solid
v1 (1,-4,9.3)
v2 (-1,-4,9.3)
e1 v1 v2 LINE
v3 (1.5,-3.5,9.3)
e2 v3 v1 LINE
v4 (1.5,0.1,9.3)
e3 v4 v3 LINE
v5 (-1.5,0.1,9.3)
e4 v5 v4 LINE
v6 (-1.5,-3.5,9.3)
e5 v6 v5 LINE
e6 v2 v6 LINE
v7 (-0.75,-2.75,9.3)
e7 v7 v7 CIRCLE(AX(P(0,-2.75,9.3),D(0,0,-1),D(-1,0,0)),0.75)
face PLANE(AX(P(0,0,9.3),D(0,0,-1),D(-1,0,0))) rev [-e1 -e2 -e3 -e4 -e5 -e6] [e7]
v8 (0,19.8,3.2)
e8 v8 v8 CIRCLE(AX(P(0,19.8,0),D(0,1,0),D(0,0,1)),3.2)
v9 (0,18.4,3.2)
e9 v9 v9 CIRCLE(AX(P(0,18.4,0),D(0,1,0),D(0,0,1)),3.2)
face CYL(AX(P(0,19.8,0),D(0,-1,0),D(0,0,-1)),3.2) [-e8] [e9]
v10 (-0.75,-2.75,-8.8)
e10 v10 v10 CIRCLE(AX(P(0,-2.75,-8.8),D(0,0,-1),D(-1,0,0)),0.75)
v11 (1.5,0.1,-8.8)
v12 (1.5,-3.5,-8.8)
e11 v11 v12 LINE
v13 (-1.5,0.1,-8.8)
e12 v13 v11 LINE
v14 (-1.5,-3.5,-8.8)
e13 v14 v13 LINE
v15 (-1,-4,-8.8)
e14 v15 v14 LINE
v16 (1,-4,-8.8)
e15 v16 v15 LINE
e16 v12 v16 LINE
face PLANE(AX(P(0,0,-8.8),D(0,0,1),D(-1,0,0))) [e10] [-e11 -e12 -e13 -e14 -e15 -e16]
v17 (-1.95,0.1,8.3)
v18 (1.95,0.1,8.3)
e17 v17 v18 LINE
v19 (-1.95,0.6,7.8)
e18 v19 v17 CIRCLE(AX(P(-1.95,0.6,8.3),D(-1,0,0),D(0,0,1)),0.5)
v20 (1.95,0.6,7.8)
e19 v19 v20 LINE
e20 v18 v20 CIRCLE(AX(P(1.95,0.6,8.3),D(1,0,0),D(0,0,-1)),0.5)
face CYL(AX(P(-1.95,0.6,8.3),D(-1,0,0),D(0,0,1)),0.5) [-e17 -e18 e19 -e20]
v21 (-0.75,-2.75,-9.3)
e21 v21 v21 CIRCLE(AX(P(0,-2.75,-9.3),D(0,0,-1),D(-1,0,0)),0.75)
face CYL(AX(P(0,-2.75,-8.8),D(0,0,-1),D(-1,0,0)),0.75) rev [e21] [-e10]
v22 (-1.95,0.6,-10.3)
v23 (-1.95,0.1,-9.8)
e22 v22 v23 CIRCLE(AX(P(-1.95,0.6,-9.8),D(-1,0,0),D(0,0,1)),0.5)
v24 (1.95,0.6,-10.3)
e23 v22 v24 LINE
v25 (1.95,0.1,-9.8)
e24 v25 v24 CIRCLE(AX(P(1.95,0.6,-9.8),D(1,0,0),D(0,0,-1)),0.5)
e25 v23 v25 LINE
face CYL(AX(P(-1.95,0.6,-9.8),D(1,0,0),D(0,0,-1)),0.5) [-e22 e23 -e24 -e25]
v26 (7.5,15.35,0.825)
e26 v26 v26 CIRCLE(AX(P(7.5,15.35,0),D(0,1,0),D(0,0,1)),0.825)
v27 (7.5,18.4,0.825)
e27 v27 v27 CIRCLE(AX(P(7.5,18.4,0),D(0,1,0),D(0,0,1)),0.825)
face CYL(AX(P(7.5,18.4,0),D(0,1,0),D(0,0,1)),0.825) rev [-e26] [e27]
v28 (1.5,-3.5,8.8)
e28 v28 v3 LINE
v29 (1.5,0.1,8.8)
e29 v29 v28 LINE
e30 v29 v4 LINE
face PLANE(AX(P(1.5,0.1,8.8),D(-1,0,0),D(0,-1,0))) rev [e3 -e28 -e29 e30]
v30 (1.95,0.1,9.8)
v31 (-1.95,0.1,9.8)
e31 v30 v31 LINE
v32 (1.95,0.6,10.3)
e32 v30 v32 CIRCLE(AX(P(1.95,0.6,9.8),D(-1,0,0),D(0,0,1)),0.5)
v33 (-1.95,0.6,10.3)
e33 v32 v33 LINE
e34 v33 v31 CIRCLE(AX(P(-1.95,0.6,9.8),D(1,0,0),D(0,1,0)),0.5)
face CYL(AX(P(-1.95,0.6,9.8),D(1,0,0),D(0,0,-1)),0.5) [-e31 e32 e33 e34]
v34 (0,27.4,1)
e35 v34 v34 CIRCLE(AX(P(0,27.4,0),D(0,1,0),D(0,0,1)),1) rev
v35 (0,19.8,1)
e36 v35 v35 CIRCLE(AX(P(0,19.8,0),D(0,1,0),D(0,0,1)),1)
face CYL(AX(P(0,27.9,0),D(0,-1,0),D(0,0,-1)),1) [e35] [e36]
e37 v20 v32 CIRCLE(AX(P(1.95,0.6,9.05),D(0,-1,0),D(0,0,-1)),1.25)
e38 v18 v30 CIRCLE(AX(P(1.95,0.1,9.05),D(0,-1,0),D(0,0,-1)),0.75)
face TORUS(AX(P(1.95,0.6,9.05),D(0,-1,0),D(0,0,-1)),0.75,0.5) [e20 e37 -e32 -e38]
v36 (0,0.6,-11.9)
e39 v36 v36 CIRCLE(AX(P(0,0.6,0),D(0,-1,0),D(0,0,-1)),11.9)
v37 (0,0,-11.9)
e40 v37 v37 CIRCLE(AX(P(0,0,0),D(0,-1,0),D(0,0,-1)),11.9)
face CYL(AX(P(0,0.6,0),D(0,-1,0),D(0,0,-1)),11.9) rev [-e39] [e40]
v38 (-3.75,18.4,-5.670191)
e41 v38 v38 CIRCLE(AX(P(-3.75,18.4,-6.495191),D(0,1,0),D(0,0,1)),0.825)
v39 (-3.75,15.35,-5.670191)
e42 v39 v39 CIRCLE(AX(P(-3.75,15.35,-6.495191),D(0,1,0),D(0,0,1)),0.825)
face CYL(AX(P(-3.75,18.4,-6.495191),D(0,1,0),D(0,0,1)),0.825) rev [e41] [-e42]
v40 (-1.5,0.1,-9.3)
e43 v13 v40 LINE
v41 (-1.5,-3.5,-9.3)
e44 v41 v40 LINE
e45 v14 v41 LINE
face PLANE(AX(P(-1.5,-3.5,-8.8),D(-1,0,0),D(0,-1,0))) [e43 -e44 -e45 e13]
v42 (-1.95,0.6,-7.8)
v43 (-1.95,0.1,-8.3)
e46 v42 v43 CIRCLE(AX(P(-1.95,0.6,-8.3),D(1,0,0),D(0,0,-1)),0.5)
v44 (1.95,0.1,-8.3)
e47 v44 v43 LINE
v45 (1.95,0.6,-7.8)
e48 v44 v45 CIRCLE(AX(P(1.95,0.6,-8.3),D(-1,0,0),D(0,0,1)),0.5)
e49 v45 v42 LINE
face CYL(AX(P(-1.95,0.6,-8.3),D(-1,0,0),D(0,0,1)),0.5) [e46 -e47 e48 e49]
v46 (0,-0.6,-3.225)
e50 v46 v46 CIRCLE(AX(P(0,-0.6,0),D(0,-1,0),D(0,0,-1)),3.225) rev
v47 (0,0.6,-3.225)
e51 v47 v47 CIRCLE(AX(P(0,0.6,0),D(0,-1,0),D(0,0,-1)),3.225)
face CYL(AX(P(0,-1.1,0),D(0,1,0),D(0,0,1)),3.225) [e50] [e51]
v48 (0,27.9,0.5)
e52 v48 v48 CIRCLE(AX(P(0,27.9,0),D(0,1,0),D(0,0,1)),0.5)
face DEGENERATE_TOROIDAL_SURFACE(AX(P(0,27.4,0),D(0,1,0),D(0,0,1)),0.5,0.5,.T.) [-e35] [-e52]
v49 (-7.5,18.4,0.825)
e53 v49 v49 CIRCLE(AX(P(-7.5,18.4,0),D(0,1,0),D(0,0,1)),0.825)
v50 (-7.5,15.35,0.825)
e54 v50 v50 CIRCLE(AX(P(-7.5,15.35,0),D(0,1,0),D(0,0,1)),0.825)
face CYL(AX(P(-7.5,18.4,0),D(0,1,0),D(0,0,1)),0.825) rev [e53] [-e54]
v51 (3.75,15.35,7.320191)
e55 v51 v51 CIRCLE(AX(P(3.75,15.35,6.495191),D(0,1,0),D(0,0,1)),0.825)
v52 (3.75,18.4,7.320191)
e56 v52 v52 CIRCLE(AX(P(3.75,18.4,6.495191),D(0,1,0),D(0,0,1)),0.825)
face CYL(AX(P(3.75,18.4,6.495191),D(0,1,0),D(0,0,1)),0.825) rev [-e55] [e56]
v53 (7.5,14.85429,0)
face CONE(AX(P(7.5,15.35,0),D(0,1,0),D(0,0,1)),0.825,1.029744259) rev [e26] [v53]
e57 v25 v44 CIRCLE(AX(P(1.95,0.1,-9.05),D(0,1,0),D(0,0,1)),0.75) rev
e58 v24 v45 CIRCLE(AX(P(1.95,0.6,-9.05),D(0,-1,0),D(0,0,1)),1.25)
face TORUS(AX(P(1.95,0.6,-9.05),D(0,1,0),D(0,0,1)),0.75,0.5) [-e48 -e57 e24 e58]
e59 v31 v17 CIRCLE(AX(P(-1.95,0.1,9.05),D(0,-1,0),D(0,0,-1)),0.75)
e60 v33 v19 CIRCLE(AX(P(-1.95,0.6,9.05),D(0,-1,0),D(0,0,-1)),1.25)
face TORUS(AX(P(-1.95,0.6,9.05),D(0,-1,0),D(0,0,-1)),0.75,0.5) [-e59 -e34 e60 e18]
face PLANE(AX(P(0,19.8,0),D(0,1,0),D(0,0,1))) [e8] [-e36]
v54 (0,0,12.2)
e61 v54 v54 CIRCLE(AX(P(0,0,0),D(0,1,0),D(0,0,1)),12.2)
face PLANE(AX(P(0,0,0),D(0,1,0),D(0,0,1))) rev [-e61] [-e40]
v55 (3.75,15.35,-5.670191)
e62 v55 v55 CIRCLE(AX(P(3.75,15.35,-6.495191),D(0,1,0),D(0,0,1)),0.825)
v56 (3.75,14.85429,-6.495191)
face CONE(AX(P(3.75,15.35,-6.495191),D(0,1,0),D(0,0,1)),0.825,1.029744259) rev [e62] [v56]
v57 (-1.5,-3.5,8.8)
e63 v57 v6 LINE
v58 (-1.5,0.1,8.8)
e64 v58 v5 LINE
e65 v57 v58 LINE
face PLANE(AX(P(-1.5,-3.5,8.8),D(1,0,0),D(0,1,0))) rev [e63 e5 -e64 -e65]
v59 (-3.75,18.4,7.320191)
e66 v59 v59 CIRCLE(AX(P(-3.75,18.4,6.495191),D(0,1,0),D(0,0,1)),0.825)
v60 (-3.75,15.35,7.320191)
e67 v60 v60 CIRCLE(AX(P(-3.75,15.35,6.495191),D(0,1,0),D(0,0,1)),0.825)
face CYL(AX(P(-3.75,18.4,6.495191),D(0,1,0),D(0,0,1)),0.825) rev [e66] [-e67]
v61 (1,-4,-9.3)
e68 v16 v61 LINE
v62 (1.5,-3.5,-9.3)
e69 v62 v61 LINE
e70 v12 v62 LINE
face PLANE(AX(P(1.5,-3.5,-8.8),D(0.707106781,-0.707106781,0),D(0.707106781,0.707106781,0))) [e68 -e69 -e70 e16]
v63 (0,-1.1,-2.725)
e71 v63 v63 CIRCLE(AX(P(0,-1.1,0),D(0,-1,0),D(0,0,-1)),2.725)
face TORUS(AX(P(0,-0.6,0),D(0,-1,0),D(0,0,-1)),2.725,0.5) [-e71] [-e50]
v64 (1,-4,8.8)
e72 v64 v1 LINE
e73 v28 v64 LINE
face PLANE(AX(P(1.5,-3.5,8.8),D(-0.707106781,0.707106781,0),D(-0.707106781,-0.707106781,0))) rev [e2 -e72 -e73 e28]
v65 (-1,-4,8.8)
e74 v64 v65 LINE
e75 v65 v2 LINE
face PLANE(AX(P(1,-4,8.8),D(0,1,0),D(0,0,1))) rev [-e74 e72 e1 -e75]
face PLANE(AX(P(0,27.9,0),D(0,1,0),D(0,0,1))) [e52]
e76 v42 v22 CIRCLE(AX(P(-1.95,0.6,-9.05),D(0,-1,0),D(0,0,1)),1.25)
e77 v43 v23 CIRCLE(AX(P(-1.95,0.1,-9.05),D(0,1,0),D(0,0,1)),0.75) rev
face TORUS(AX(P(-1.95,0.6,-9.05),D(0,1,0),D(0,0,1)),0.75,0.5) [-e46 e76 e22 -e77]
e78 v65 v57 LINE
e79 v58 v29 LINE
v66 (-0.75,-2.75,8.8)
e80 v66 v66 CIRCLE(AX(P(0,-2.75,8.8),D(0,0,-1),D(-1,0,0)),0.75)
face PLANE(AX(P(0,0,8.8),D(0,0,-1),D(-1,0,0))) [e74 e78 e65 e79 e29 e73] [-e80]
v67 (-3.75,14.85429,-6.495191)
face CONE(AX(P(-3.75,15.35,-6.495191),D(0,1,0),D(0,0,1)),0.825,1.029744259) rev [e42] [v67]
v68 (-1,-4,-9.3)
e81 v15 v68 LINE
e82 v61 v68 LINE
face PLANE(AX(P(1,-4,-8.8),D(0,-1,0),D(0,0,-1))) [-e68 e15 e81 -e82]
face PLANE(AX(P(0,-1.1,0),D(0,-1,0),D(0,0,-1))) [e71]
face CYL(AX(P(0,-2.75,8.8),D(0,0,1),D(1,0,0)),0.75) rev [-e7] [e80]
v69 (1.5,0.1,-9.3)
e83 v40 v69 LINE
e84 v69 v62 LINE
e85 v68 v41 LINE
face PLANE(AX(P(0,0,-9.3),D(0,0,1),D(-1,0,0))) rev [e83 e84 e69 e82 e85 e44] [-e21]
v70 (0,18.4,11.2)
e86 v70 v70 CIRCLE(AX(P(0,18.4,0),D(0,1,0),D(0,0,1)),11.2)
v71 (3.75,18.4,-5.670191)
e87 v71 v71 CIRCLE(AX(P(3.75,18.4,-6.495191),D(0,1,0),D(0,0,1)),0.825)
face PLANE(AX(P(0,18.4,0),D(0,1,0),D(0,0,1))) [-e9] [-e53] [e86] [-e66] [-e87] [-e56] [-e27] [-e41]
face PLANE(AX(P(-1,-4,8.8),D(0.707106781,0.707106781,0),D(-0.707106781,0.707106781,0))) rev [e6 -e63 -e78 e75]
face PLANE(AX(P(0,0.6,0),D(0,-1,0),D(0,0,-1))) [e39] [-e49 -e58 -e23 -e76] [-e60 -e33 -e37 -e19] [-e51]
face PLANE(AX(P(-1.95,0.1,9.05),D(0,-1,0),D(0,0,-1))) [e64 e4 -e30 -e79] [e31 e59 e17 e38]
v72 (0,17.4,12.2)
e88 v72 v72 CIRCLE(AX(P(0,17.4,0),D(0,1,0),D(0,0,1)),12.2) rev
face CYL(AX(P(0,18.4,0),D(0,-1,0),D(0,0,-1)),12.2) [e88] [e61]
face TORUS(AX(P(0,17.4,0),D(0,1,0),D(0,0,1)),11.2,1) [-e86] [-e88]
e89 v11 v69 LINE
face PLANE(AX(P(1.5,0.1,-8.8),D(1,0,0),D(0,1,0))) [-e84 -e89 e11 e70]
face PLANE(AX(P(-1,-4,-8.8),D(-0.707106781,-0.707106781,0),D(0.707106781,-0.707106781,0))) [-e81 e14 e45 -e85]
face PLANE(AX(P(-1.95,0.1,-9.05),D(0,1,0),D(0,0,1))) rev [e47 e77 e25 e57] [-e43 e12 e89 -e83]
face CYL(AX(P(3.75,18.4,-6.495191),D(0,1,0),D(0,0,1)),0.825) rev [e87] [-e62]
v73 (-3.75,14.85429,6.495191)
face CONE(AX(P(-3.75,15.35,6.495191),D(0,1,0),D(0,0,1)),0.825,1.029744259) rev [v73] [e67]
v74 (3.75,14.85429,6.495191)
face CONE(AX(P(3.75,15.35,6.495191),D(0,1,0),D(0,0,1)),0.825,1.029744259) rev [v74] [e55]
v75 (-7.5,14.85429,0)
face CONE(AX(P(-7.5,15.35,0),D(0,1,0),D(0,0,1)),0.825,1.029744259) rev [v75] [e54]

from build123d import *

# Parameters (mm, degrees)
SKETCH1_R                  = 12.2
BOSS_EXTRUDE1_DEPTH        = 18.4
FILLET1_R                  = 1
M2X0_35_TAPPED_HOLE1_D     = 1.65
M2X0_35_TAPPED_HOLE1_DEPTH = 3.05
M2X0_35_TAPPED_HOLE1_TIP   = 0.495710011
SKETCH5_R                  = 3.2
BOSS_EXTRUDE2_DEPTH        = 1.4
SKETCH6_R                  = 1
BOSS_EXTRUDE3_DEPTH        = 8.1
FILLET2_R                  = 0.5
SKETCH8_R                  = 11.9
CUT_EXTRUDE1_DEPTH         = 0.6
SKETCH9_R                  = 3.225
BOSS_EXTRUDE4_DEPTH        = 1.7
FILLET3_R                  = 0.5
BOSS_EXTRUDE5_DEPTH        = 0.5
FILLET4_R                  = 0.5
SKETCH12_R                 = 0.75
BOSS_EXTRUDE6_DEPTH        = 0.25


with BuildPart() as part:
    # Sketch1 → Boss-Extrude1 (new body)
    with BuildSketch(Plane(origin=(0, 0, 0), x_dir=(1, 0, 0), z_dir=(0, 1, 0))):
        with Locations(Location((0, 0, 0), (0, 0, 270))):
            Circle(SKETCH1_R)
    extrude(amount=BOSS_EXTRUDE1_DEPTH)

    # Fillet1
    fillet1_edges = [part.edges().sort_by_distance(p)[0] for p in [
        (0, 18.4, -12.2),
    ]]
    fillet(fillet1_edges, radius=FILLET1_R)

    # M2x0.35 Tapped Hole1
    with Locations(Plane(origin=(0, 18.4, 0), x_dir=(1, 0, 0), z_dir=(0, 1, 0))):
        with Locations((-7.5, 0), (-3.75, 6.495190528), (3.75, 6.495190528), (7.5, 0), (3.75, -6.495190528), (-3.75, -6.495190528)):
            Hole(M2X0_35_TAPPED_HOLE1_D / 2, depth=M2X0_35_TAPPED_HOLE1_DEPTH)
            with Locations((0, 0, -(M2X0_35_TAPPED_HOLE1_DEPTH + M2X0_35_TAPPED_HOLE1_TIP / 2))):  # 118° drill point
                Cone(0, M2X0_35_TAPPED_HOLE1_D / 2, M2X0_35_TAPPED_HOLE1_TIP, mode=Mode.SUBTRACT)

    # Sketch5 → Boss-Extrude2 (add)
    with BuildSketch(Plane(origin=(0, 18.4, 0), x_dir=(1, 0, 0), z_dir=(0, 1, 0))):
        with Locations(Location((0, 0, 0), (0, 0, 270))):
            Circle(SKETCH5_R)
    extrude(amount=BOSS_EXTRUDE2_DEPTH)

    # Sketch6 → Boss-Extrude3 (add)
    with BuildSketch(Plane(origin=(0, 19.8, 0), x_dir=(1, 0, 0), z_dir=(0, 1, 0))):
        with Locations(Location((0, 0, 0), (0, 0, 270))):
            Circle(SKETCH6_R)
    extrude(amount=BOSS_EXTRUDE3_DEPTH)

    # Fillet2
    fillet2_edges = [part.edges().sort_by_distance(p)[0] for p in [
        (0, 27.9, -1),
    ]]
    fillet(fillet2_edges, radius=FILLET2_R)

    # Sketch8 → Cut-Extrude1 (cut)
    with BuildSketch(Plane.XZ):
        with Locations(Location((0, 0, 0), (0, 0, 270))):
            Circle(SKETCH8_R)
    extrude(amount=-CUT_EXTRUDE1_DEPTH, mode=Mode.SUBTRACT)

    # Sketch9 → Boss-Extrude4 (add)
    with BuildSketch(Plane.XZ.offset(-0.6)):
        with Locations(Location((0, 0, 0), (0, 0, 270))):
            Circle(SKETCH9_R)
    extrude(amount=BOSS_EXTRUDE4_DEPTH)

    # Fillet3
    fillet3_edges = [part.edges().sort_by_distance(p)[0] for p in [
        (0, -1.1, 3.225),
    ]]
    fillet(fillet3_edges, radius=FILLET3_R)

    # Sketch11 → Boss-Extrude5 (add)
    with BuildSketch(Plane.XZ.offset(-0.6)):
        with BuildLine():
            Line((-1.95, 10.3), (1.95, 10.3))
            ThreePointArc((1.95, 10.3), (3.2, 9.05), (1.95, 7.8))
            Line((1.95, 7.8), (-1.95, 7.8))
            ThreePointArc((-1.95, 7.8), (-3.2, 9.05), (-1.95, 10.3))
        make_face()
        with BuildLine():
            Line((-1.95, -10.3), (1.95, -10.3))
            ThreePointArc((1.95, -10.3), (3.2, -9.05), (1.95, -7.8))
            Line((1.95, -7.8), (-1.95, -7.8))
            ThreePointArc((-1.95, -7.8), (-3.2, -9.05), (-1.95, -10.3))
        make_face()
    extrude(amount=BOSS_EXTRUDE5_DEPTH)

    # Fillet4
    fillet4_edges = [part.edges().sort_by_distance(p)[0] for p in [
        (0, 0.1, -7.8),
        (3.2, 0.1, -9.05),
        (0, 0.1, -10.3),
        (-3.2, 0.1, -9.05),
        (0, 0.1, 10.3),
        (3.2, 0.1, 9.05),
        (0, 0.1, 7.8),
        (-3.2, 0.1, 9.05),
    ]]
    fillet(fillet4_edges, radius=FILLET4_R - 0.0001)  # a hair under: the kernel refuses the full size

    # Sketch12 → Boss-Extrude6 (add, symmetric)
    with BuildSketch(Plane(origin=(0, 0, 9.05), x_dir=(-1, 0, 0), z_dir=(0, 0, -1))):
        Polygon((-1.5, 0.1), (-1.5, -3.5), (-1, -4), (1, -4), (1.5, -3.5), (1.5, 0.1), align=None)
        with Locations((0, -2.75)):
            Circle(SKETCH12_R, mode=Mode.SUBTRACT)
    boss_extrude6 = extrude(amount=BOSS_EXTRUDE6_DEPTH, both=True)

    # Mirror4: Boss-Extrude6 across plane
    add(boss_extrude6.mirror(Plane.XY))


solid = part.part
